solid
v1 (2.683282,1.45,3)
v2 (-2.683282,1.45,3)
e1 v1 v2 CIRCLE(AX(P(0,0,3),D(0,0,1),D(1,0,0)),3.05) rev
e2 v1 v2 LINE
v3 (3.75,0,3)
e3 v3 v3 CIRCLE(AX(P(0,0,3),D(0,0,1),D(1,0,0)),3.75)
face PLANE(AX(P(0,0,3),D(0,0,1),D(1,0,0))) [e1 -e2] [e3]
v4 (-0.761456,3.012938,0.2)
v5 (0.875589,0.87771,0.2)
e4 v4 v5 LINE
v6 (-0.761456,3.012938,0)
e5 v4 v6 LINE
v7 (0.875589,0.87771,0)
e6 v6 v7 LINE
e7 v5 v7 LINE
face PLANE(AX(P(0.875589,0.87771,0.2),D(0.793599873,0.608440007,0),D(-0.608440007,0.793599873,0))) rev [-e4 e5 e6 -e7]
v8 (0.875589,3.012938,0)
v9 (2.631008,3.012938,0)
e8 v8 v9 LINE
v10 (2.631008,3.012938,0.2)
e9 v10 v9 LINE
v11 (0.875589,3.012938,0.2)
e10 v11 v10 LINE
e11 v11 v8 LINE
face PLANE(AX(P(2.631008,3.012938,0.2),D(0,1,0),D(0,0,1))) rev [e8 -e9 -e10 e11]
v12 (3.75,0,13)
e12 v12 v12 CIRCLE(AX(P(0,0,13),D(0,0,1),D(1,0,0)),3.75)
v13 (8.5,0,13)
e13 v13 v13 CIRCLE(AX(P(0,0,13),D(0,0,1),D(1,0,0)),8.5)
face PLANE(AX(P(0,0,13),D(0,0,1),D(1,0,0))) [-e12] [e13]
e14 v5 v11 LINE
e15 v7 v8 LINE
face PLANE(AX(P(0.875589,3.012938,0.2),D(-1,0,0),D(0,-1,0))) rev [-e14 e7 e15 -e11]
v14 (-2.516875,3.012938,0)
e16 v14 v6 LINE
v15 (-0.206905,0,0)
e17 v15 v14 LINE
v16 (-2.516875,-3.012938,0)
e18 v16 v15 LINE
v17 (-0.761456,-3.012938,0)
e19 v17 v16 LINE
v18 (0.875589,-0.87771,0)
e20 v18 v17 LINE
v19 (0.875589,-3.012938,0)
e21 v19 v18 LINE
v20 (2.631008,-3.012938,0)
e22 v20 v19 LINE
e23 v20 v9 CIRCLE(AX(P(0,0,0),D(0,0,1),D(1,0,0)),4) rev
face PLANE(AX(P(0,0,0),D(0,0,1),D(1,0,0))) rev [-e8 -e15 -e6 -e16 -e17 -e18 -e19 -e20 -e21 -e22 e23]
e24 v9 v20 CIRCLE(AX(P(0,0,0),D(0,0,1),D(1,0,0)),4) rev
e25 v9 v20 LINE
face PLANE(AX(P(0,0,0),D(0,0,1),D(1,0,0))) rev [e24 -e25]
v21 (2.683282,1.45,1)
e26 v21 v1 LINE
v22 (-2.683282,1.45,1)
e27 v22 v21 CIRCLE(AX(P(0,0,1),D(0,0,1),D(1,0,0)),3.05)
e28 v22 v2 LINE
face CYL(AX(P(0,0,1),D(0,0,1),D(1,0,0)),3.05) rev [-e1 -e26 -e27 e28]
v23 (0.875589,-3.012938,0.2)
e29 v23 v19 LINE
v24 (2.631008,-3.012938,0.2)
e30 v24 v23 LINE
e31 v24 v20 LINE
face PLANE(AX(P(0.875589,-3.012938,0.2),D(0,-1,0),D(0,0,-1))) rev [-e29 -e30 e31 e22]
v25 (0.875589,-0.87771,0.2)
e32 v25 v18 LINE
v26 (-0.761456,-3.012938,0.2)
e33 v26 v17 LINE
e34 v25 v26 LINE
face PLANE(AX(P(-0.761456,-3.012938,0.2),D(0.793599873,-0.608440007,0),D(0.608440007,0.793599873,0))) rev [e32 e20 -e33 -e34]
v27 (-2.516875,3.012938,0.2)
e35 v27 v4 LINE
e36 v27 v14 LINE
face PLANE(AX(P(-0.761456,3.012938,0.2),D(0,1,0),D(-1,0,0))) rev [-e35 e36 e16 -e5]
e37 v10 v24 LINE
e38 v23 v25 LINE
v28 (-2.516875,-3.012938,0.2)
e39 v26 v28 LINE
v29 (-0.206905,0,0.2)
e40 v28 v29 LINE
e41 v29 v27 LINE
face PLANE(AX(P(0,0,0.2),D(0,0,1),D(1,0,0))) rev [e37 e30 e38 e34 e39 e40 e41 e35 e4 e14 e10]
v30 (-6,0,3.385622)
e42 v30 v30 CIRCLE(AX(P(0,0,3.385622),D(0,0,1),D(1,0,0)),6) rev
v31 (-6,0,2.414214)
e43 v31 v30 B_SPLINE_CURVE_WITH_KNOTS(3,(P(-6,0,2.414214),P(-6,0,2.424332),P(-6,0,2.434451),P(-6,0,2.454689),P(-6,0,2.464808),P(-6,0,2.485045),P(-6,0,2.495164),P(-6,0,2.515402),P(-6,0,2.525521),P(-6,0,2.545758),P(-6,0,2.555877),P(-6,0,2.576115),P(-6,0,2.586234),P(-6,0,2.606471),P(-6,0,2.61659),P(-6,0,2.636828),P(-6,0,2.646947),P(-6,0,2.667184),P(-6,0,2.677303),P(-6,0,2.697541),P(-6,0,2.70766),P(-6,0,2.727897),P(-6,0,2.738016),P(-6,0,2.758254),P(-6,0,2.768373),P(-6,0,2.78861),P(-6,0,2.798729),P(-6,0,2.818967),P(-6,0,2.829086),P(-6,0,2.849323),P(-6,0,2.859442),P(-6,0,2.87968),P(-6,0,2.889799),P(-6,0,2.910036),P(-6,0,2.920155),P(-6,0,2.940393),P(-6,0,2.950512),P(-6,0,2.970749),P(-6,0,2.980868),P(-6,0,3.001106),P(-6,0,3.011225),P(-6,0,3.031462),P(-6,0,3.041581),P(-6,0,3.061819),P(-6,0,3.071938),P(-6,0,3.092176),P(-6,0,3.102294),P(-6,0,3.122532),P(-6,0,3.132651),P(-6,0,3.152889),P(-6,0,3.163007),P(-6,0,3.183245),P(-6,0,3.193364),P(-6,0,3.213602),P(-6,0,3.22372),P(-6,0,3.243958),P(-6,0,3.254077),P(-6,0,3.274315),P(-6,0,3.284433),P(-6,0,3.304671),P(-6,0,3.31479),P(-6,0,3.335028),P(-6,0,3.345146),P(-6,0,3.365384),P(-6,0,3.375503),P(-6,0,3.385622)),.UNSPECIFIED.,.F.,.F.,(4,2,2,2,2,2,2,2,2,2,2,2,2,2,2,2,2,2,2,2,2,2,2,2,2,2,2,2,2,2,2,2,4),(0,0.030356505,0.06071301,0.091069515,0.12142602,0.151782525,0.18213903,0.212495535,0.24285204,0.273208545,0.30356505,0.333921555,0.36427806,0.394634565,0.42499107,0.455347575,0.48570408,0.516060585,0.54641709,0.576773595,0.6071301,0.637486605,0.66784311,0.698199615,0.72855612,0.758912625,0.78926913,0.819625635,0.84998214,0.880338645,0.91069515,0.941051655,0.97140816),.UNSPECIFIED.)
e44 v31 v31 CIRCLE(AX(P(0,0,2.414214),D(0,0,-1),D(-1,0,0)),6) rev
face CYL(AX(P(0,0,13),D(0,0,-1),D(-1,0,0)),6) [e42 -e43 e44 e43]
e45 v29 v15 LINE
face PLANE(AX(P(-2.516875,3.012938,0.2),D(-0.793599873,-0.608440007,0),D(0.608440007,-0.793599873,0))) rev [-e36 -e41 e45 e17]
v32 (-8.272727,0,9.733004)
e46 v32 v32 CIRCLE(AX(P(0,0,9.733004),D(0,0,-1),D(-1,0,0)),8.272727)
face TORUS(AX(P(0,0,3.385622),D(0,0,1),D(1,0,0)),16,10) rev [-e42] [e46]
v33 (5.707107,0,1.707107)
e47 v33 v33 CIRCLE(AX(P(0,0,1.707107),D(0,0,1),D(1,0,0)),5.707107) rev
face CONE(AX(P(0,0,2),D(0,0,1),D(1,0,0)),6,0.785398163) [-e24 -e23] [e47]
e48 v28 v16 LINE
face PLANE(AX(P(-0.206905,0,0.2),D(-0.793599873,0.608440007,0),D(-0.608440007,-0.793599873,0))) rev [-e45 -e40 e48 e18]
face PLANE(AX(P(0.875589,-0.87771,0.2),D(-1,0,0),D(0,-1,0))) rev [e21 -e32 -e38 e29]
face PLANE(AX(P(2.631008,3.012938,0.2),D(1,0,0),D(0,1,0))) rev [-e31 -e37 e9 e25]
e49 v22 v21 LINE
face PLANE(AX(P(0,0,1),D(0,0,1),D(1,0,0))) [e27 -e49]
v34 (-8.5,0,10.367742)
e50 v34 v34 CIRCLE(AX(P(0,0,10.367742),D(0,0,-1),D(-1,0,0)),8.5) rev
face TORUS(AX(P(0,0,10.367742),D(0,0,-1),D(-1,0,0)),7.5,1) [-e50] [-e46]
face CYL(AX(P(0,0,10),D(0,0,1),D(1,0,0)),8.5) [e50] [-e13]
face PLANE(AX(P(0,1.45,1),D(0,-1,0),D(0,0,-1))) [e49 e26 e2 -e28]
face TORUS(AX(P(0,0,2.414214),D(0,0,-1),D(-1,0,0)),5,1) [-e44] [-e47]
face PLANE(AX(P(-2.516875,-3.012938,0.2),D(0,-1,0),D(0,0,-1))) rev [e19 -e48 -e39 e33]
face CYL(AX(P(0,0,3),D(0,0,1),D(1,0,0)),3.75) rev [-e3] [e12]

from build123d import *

# Parameters (mm, degrees)
ESBO_O1_R                = 6
RESSALTO_EXTRUS_O1_DEPTH = 13
CORTE_EXTRUS_O1_DEPTH    = 12
ESBO_O3_R                = 3.75
CORTE_EXTRUS_O2_DEPTH    = 10
CHANFRO1_SIZE            = 2
ESBO_O4_R                = 8.5
ESBO_O4_R_2              = 3.75
RESSALTO_EXTRUS_O2_DEPTH = 3
FILETE1_R                = 10
FILETE3_R                = 1
CORTE_EXTRUS_O3_DEPTH    = 0.2


with BuildPart() as part:
    # Esboço1 → Ressalto-extrusão1 (new body)
    with BuildSketch(Plane.XY):
        with Locations(Location((0, 0, 0), (0, 0, 180))):
            Circle(ESBO_O1_R)
    extrude(amount=RESSALTO_EXTRUS_O1_DEPTH)

    # Esboço2 → Corte-extrusão1 (cut)
    with BuildSketch(Plane.XY.offset(13)):
        with BuildLine():
            Line((2.683281573, 1.45), (-2.683281573, 1.45))
            ThreePointArc((-2.683281573, 1.45), (-0.747827254, -2.956899457), (3.05, 0))
            ThreePointArc((3.05, 0), (2.956899457, 0.747827254), (2.683281573, 1.45))
        make_face()
    extrude(amount=-CORTE_EXTRUS_O1_DEPTH, mode=Mode.SUBTRACT)

    # Esboço3 → Corte-extrusão2 (cut)
    with BuildSketch(Plane.XY.offset(13)):
        Circle(ESBO_O3_R)
    extrude(amount=-CORTE_EXTRUS_O2_DEPTH, mode=Mode.SUBTRACT)

    # Chanfro1
    chanfro1_edges = [part.edges().sort_by_distance(p)[0] for p in [
        (6, 0, 0),
    ]]
    chamfer(chanfro1_edges, length=CHANFRO1_SIZE)

    # Esboço4 → Ressalto-extrusão2 (add)
    with BuildSketch(Plane.XY.offset(13)):
        Circle(ESBO_O4_R)
        Circle(ESBO_O4_R_2, mode=Mode.SUBTRACT)
    extrude(amount=-RESSALTO_EXTRUS_O2_DEPTH)

    # Filete1
    # the kernel refuses this fillet: 10 mm, written as the material it adds along each edge
    with BuildSketch(Plane(origin=(0, 0, 10), x_dir=(-1, 0, 0), z_dir=(0, -1, 0))) as filete1_piece_1:
        with BuildLine():
            CenterArc((16, 6.614378278), FILETE1_R, 180, 41.409622109)
            Line((8.5, 0), (6, 0))
            Line((6, 0), (6, 6.614378278))
        make_face()
    revolve(axis=Axis((0, 0, 10), (0, 0, -1)))

    # Filete3
    filete3_edges = [part.edges().sort_by_distance(p)[0] for p in [
        (6, 0, 2),
        (0, 8.5, 10),
    ]]
    fillet(filete3_edges, radius=FILETE3_R)

    # Esboço5 → Corte-extrusão3 (cut)
    with BuildSketch(Plane(origin=(0, 0, 0), x_dir=(-1, 0, 0), z_dir=(0, 0, -1))):
        Polygon((-2.631008166, 3.012938106), (-2.631008166, -3.012938106), (-0.875588874, -3.012938106), (-0.875588874, -0.877709646), (0.761455767, -3.012938106), (2.51687506, -3.012938106), (0.206904827, 0), (2.51687506, 3.012938106), (0.761455767, 3.012938106), (-0.875588874, 0.877709646), (-0.875588874, 3.012938106), align=None)
    extrude(amount=-CORTE_EXTRUS_O3_DEPTH, mode=Mode.SUBTRACT)


solid = part.part
